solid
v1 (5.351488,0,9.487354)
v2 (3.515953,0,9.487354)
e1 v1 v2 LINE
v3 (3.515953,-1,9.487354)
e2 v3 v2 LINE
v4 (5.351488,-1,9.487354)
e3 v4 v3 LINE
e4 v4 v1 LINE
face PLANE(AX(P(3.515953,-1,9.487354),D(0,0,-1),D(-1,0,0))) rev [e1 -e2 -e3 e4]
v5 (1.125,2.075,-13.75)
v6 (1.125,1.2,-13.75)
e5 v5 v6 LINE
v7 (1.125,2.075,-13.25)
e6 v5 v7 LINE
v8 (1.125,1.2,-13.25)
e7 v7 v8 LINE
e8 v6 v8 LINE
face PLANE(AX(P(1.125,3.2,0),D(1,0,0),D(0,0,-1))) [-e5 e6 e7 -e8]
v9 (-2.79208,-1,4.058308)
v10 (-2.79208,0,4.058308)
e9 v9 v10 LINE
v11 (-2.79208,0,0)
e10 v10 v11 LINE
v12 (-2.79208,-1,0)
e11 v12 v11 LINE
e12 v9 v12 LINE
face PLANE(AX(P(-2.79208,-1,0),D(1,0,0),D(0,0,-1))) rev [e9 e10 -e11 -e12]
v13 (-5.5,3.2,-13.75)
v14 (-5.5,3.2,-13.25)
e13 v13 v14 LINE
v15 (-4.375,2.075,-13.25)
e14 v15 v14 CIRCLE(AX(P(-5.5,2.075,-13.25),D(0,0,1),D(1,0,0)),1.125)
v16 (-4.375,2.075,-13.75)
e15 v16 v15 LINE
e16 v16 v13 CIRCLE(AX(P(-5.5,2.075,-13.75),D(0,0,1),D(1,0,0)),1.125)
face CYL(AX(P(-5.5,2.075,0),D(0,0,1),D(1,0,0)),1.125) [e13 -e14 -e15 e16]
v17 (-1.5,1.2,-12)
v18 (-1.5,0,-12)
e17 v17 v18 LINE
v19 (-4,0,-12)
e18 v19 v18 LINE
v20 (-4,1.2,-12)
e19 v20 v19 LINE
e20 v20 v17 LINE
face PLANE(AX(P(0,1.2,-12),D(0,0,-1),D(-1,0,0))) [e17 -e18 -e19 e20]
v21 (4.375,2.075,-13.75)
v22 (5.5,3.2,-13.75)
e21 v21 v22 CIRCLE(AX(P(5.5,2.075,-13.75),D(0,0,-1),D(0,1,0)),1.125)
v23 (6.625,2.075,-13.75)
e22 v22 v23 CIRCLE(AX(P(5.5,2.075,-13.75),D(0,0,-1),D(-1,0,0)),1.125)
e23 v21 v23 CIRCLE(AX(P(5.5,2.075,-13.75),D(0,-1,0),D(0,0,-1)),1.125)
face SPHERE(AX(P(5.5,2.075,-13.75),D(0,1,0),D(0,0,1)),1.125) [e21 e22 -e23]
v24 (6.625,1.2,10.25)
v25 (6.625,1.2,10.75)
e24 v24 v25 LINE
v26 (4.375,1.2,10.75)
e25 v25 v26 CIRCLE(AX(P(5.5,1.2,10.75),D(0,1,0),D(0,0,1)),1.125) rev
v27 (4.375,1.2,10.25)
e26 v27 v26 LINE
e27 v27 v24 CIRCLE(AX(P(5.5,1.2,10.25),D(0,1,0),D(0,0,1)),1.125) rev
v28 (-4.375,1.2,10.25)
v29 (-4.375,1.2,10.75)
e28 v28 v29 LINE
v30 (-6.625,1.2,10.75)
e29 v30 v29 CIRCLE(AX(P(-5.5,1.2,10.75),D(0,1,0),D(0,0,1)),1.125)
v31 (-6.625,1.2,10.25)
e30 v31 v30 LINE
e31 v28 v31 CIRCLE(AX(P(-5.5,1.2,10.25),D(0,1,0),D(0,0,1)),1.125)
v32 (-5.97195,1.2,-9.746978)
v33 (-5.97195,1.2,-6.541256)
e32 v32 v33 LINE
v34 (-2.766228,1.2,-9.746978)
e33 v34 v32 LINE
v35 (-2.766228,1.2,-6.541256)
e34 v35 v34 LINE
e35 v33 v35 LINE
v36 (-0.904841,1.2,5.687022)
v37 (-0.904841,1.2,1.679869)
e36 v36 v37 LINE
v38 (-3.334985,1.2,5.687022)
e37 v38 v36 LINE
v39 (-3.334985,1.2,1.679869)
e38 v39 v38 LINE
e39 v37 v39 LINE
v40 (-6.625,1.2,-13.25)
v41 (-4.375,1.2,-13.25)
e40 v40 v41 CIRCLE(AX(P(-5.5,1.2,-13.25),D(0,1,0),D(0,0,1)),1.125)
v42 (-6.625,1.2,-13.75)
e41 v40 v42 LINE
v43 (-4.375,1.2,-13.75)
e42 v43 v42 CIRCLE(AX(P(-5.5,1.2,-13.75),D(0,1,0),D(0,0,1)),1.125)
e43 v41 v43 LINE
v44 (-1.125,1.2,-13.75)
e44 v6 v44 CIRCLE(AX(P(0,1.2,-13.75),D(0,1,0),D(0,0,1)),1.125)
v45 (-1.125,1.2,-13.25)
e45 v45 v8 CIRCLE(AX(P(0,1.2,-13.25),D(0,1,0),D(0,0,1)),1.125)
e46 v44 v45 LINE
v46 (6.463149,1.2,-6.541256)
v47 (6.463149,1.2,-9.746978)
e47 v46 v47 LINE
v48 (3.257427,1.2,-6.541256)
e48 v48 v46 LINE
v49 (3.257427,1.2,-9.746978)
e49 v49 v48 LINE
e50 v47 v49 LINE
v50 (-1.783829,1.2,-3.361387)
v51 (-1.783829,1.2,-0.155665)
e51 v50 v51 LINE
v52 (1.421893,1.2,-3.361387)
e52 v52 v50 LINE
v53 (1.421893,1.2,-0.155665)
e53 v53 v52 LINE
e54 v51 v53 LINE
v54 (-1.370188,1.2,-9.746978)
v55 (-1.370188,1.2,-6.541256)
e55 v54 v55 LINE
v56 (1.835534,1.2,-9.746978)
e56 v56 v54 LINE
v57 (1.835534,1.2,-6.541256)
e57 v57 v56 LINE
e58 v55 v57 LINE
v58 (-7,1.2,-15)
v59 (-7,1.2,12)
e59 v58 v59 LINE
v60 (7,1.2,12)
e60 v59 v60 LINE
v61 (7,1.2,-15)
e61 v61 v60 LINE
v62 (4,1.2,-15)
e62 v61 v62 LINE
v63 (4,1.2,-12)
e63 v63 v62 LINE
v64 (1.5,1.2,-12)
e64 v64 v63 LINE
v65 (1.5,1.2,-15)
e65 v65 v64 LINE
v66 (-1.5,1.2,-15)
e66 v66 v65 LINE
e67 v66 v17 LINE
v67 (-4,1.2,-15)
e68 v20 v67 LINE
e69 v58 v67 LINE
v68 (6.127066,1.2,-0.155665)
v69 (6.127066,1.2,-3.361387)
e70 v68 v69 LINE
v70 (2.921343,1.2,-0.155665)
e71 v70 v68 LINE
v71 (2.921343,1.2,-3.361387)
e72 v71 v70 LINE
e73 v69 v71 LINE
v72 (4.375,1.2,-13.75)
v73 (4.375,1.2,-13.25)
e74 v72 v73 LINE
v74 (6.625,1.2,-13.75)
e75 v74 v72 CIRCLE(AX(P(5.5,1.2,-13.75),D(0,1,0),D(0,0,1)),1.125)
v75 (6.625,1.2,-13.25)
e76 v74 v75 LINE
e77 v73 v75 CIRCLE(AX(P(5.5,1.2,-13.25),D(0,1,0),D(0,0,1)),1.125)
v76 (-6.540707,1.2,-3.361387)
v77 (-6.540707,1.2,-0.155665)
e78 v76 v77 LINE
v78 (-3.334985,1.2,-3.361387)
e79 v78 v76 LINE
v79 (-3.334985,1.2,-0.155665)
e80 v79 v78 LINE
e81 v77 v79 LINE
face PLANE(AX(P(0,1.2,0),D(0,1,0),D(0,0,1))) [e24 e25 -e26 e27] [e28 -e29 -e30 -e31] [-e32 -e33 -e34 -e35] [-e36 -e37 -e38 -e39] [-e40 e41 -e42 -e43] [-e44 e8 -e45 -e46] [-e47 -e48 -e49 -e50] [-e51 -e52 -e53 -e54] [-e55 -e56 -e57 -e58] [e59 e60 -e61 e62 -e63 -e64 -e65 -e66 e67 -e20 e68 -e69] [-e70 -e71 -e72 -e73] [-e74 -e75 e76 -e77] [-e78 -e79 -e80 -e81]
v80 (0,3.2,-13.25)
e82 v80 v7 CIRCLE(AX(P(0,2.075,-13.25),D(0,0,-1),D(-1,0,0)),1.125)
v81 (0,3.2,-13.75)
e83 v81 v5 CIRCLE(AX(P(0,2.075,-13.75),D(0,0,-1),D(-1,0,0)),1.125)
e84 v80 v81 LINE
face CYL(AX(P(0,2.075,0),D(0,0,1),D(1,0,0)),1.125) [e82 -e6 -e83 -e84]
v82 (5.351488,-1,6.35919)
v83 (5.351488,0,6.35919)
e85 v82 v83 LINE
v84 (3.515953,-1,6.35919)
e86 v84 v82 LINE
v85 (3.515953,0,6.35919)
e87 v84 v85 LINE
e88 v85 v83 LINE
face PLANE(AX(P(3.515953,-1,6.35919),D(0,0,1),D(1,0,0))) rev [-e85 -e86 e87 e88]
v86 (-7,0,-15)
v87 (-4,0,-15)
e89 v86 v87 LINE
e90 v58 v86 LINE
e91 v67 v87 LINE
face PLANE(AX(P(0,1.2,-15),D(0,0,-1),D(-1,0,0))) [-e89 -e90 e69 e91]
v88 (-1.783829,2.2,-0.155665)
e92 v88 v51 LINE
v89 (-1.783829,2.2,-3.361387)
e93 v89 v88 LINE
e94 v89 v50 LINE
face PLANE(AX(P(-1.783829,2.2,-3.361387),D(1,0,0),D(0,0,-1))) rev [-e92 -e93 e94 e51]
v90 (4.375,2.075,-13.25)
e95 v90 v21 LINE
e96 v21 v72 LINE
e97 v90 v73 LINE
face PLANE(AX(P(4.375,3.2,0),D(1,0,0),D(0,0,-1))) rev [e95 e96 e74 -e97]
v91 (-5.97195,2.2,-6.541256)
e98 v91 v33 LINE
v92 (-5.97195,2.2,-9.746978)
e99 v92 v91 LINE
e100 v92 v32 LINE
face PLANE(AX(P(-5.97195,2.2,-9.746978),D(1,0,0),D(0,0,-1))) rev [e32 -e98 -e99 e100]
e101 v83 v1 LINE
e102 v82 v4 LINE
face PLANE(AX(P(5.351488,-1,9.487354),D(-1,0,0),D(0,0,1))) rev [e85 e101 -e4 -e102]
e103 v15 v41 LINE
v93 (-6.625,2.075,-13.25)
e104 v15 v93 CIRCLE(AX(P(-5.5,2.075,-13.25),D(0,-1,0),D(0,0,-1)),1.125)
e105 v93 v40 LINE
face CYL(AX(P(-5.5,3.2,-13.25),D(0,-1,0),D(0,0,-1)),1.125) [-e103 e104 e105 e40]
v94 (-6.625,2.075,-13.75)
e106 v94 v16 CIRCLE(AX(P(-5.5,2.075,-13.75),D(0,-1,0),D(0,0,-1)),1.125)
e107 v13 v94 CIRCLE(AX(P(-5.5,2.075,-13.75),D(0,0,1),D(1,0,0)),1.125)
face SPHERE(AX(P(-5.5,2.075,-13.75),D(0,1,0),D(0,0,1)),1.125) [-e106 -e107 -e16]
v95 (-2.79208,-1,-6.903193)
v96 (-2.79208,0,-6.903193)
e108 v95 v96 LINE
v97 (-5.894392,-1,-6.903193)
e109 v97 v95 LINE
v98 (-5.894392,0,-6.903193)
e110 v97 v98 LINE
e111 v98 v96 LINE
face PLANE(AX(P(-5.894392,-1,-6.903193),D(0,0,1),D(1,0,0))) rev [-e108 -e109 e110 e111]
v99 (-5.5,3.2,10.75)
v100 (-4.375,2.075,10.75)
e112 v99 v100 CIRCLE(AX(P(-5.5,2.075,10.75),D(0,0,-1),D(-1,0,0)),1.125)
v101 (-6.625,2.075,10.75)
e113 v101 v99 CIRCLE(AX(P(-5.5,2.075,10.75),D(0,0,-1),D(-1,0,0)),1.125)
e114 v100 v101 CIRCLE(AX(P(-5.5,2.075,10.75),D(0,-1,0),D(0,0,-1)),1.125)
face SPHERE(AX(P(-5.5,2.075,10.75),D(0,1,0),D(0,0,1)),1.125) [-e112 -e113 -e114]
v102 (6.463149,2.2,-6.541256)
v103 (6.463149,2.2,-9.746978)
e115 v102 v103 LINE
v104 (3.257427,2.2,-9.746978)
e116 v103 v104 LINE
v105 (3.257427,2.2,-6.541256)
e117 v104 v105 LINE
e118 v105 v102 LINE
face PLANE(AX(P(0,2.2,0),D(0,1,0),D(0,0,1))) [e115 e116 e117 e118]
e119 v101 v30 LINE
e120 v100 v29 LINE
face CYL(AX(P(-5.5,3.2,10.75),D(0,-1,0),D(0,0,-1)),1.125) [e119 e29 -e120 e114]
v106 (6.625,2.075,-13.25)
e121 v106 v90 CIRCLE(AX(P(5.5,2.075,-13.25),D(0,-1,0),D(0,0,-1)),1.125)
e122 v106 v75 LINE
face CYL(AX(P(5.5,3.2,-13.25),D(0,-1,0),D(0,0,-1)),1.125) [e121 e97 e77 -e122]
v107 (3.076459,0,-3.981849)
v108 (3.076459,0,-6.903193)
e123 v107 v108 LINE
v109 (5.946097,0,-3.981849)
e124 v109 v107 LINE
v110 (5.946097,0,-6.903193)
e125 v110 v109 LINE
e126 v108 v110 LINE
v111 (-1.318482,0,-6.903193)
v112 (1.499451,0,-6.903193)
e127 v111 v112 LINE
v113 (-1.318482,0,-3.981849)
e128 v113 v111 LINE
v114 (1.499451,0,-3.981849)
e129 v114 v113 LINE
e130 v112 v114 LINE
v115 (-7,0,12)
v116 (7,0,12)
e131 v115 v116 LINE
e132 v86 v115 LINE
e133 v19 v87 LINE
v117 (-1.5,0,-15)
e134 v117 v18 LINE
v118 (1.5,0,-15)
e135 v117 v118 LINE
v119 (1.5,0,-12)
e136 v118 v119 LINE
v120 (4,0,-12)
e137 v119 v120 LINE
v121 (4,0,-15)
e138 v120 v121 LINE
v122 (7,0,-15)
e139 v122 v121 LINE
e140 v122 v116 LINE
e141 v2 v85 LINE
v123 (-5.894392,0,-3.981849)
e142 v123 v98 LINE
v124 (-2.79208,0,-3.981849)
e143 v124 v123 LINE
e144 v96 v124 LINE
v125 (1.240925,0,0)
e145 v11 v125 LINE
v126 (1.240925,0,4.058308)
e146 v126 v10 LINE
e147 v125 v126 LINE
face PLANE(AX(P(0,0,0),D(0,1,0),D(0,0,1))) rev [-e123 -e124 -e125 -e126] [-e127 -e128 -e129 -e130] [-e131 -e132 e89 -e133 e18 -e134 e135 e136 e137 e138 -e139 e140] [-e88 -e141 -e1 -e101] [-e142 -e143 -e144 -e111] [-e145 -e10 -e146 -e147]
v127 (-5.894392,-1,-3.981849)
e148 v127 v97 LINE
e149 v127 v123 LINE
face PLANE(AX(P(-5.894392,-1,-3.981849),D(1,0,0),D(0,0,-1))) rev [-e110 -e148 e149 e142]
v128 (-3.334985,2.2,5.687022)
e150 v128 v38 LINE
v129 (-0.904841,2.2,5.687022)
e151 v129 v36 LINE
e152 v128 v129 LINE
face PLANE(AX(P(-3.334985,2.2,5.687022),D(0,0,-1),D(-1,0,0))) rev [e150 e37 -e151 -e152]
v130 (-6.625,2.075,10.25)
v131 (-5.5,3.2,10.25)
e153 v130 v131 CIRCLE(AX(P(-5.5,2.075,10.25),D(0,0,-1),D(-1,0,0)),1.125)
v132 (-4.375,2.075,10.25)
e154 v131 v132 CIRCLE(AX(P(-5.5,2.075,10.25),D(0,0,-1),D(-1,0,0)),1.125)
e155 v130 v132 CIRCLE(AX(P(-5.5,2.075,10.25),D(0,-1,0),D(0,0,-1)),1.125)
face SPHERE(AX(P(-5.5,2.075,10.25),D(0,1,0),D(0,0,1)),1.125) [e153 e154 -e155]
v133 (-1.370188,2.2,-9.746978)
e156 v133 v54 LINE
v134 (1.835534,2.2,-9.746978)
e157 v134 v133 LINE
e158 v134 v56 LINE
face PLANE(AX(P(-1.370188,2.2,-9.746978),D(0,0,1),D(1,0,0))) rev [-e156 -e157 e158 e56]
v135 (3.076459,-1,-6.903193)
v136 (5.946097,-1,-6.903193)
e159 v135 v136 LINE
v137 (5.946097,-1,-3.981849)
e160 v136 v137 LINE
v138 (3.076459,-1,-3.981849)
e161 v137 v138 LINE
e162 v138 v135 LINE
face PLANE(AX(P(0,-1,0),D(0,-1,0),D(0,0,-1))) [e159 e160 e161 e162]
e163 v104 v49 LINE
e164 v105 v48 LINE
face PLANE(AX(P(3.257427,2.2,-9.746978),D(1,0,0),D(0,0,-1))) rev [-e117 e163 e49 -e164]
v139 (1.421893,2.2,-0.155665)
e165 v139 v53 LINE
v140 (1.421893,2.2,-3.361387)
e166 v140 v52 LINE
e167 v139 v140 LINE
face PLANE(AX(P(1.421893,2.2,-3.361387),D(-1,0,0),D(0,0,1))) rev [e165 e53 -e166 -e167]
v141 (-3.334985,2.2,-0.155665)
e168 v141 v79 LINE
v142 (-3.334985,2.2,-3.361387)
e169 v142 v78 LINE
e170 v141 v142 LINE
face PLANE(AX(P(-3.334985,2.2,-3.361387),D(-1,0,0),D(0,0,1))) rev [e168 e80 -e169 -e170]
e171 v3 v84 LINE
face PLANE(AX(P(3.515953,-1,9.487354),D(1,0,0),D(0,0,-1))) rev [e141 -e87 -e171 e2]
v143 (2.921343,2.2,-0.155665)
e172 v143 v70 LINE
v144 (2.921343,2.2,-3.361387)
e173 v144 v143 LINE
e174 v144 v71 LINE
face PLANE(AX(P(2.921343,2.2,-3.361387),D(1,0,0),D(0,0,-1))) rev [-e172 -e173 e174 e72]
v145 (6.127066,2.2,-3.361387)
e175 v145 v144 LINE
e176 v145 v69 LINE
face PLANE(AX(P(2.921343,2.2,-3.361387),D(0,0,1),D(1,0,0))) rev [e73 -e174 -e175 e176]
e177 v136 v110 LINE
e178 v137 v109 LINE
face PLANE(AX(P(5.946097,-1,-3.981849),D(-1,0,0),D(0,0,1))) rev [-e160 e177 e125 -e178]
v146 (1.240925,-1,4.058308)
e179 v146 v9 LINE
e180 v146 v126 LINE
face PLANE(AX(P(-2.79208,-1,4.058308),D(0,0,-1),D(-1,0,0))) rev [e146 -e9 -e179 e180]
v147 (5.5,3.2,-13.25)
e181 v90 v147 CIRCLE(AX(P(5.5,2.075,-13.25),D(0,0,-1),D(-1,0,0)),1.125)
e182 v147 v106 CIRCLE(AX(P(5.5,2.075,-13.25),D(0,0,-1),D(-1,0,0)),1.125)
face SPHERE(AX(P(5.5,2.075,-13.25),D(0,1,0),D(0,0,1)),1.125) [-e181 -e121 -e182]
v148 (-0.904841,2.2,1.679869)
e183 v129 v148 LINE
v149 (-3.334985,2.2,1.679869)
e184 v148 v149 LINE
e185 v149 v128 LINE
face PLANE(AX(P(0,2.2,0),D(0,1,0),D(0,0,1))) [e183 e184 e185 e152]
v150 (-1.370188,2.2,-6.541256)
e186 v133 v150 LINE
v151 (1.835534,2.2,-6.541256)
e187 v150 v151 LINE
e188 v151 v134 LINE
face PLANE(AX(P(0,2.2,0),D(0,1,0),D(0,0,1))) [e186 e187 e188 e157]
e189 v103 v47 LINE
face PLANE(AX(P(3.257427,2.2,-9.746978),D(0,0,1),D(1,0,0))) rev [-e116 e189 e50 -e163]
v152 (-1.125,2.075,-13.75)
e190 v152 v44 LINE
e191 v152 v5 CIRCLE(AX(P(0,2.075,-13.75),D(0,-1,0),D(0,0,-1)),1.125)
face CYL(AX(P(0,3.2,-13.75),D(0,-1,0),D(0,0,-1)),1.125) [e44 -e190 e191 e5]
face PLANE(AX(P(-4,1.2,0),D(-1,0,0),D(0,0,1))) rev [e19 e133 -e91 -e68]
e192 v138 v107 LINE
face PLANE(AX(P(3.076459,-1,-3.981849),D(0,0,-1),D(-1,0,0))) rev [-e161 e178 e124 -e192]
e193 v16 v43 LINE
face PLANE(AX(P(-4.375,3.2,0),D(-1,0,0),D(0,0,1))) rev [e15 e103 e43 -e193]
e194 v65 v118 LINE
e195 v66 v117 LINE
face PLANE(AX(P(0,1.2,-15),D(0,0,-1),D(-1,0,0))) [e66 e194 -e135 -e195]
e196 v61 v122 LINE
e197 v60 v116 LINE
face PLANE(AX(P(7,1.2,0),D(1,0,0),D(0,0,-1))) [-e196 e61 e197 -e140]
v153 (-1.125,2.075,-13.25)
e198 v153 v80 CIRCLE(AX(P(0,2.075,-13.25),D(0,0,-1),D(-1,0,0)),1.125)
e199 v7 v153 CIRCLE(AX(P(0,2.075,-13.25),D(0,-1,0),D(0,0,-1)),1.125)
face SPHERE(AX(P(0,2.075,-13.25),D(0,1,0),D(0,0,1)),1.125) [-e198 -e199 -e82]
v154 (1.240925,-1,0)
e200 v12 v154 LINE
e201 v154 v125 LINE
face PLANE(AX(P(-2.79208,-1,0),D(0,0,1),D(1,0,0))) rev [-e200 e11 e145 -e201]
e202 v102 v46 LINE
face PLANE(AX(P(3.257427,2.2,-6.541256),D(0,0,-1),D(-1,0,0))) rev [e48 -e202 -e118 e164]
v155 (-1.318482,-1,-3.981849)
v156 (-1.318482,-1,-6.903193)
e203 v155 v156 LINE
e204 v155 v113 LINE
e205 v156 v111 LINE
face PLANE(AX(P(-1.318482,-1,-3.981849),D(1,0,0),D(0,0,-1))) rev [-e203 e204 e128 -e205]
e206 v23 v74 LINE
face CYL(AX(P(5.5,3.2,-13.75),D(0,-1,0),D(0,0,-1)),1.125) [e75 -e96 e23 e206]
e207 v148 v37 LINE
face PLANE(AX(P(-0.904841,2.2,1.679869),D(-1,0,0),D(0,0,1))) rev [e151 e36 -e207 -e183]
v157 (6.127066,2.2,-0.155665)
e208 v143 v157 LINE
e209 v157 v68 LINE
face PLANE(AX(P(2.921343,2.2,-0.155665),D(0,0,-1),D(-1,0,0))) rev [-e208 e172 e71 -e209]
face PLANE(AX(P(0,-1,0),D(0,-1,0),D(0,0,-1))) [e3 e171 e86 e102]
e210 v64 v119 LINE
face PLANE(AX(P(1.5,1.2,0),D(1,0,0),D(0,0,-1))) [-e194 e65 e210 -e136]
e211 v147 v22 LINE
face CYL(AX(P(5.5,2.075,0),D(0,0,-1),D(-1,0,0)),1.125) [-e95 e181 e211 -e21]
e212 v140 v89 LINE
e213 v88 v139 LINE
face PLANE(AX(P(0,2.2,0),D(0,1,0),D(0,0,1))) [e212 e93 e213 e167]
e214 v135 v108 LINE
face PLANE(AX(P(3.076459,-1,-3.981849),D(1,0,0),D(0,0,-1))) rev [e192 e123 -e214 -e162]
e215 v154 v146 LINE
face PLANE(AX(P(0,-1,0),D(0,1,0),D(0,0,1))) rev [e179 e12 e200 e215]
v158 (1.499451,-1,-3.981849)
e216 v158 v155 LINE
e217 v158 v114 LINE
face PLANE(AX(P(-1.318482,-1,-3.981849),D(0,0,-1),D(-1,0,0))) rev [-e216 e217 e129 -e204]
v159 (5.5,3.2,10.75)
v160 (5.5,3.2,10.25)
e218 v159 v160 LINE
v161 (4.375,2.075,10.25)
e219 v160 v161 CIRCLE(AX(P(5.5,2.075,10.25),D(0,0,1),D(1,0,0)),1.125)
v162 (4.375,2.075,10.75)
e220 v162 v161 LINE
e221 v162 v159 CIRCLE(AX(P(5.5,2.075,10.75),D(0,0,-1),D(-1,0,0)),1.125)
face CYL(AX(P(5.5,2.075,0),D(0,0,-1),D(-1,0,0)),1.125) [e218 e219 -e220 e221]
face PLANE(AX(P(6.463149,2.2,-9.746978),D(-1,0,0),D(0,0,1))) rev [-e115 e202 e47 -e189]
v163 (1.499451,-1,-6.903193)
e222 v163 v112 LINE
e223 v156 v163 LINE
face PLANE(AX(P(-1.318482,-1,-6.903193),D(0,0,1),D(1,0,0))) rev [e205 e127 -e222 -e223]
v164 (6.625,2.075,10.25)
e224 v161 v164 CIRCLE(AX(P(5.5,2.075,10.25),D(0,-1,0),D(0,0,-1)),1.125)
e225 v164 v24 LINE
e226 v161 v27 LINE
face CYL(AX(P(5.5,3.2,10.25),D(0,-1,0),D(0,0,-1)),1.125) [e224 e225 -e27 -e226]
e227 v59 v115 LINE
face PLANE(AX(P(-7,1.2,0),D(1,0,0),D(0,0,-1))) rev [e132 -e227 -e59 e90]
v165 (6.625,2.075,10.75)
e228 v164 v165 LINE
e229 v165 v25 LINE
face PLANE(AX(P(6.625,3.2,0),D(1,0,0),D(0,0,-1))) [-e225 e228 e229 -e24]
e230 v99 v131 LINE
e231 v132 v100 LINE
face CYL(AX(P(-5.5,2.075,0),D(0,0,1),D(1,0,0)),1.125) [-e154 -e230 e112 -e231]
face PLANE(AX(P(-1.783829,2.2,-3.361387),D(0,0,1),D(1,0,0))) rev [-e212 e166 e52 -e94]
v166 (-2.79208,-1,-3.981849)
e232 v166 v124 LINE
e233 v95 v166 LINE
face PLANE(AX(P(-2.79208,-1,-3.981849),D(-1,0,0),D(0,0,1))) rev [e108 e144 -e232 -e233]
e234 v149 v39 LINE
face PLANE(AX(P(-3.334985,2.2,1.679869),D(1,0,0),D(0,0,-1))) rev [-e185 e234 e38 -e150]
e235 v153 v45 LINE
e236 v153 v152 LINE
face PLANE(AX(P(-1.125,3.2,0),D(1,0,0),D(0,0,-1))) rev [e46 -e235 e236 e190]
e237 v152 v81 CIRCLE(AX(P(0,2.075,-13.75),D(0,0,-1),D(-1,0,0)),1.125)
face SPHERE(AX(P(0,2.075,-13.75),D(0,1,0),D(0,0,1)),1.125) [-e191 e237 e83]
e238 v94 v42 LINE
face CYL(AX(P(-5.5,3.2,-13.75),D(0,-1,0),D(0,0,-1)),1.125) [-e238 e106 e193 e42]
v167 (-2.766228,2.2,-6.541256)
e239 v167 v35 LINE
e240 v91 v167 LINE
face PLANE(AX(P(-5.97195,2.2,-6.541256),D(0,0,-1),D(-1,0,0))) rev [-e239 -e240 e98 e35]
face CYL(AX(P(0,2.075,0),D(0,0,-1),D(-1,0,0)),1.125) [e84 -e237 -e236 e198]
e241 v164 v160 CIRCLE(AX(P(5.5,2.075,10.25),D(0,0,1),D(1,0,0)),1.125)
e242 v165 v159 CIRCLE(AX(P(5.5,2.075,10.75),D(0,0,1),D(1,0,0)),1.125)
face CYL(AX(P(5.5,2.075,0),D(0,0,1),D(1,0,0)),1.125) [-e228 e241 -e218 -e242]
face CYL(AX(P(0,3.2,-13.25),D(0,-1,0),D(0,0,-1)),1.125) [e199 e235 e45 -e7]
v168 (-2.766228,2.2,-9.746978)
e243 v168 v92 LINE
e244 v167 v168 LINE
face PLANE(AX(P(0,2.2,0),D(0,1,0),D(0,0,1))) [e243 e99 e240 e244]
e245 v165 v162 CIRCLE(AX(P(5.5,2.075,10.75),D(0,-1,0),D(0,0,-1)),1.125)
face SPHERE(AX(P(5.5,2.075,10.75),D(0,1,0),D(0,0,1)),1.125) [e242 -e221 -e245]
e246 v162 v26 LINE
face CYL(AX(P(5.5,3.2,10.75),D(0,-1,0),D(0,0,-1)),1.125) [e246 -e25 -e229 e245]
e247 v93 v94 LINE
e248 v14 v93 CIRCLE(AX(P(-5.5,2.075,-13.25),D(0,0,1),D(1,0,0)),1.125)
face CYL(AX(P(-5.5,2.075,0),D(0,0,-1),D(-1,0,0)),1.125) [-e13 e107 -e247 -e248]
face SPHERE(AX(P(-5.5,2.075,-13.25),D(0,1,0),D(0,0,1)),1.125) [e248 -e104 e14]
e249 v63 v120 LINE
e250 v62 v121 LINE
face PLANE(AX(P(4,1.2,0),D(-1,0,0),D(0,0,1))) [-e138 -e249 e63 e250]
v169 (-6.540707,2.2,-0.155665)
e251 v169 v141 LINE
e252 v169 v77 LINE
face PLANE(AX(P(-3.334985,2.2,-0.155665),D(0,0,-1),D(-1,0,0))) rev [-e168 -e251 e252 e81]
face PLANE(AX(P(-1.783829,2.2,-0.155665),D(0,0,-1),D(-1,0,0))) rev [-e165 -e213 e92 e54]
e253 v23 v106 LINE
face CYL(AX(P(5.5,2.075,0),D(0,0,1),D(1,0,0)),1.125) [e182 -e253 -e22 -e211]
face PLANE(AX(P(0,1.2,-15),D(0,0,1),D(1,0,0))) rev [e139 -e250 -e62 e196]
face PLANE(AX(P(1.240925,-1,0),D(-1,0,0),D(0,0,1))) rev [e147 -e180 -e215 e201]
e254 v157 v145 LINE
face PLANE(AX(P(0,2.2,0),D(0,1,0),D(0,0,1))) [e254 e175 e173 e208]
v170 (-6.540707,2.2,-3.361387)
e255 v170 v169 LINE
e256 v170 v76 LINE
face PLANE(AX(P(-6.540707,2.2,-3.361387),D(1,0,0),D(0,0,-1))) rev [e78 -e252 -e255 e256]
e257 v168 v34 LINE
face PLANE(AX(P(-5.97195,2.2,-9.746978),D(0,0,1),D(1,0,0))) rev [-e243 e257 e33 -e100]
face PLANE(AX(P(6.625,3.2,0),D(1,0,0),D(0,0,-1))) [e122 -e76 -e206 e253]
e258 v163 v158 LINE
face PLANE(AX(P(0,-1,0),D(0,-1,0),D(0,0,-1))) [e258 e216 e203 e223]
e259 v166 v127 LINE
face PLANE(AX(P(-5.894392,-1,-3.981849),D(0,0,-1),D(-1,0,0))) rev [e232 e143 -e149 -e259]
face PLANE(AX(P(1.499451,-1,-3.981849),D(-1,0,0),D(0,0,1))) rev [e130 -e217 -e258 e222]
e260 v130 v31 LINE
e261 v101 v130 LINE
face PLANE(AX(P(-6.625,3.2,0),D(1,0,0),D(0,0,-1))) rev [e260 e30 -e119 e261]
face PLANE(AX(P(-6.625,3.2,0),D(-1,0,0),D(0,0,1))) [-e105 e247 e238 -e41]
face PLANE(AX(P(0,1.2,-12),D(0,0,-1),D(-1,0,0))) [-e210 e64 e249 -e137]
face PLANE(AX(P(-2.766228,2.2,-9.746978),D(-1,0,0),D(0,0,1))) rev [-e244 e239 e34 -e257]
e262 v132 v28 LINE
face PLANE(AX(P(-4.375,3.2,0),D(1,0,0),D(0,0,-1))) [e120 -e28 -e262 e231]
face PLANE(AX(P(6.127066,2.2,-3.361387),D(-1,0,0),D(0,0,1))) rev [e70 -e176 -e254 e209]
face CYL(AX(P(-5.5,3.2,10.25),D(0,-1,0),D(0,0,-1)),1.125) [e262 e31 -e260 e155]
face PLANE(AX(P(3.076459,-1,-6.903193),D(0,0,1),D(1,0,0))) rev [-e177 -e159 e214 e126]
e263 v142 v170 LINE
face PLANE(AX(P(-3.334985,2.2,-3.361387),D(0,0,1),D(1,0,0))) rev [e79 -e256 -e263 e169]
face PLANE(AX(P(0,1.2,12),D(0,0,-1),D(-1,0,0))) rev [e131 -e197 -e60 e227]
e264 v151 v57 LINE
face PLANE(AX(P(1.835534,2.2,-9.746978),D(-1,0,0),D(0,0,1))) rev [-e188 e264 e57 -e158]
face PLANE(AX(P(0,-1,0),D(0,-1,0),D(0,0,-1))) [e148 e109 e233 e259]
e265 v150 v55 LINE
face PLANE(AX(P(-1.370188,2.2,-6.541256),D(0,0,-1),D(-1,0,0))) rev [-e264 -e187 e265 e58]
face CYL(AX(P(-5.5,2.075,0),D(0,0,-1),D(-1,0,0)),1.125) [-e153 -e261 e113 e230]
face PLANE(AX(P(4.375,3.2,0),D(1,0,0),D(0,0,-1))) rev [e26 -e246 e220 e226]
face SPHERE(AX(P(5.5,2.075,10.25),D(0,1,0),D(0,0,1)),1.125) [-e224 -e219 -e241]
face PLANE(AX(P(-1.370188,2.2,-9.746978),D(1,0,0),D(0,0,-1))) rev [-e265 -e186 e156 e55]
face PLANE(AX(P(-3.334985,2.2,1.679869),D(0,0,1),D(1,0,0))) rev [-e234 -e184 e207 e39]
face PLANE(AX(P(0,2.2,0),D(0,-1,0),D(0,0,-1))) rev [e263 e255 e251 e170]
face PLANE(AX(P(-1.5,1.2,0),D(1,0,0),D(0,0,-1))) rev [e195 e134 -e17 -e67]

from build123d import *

# Parameters (mm, degrees)
SKETCH1_W               = 14
SKETCH1_H               = 24
SKETCH1_W_2             = 3
SKETCH1_H_2             = 3
PCB_DEPTH               = 1.2
SOLDER_JOINTS_DEPTH     = 2
SOLDER_FILLETS_R        = 1.125
SKETCH2_W               = 3.205722041
SKETCH2_H               = 3.205722042
SKETCH2_W_2             = 3.205722042
SKETCH2_W_3             = 2.430144128
SKETCH2_H_2             = 4.007152552
TOP_COMPONENTS_DEPTH    = 1
SKETCH3_W               = 4.033005149
SKETCH3_H               = 4.058308378
SKETCH3_W_2             = 3.102311653
SKETCH3_H_2             = 2.921343474
SKETCH3_W_3             = 2.817933085
SKETCH3_W_4             = 2.869638279
SKETCH3_W_5             = 1.835534395
SKETCH3_H_3             = 3.12816425
BOTTOM_COMPONENTS_DEPTH = 1


with BuildPart() as part:
    # Sketch1 → PCB (new body)
    with BuildSketch(Plane(origin=(0, 0, 0), x_dir=(1, 0, 0), z_dir=(0, 1, 0))):
        Rectangle(SKETCH1_W, SKETCH1_H)
        with Locations((-5.5, 13.5)):
            Rectangle(SKETCH1_W_2, SKETCH1_H_2)
        with Locations((0, 13.5)):
            Rectangle(SKETCH1_W_2, SKETCH1_H_2)
        with Locations((5.5, 13.5)):
            Rectangle(SKETCH1_W_2, SKETCH1_H_2)
    extrude(amount=PCB_DEPTH)

    # Sketch5 → Solder joints (add)
    with BuildSketch(Plane(origin=(0, 1.2, 0), x_dir=(1, 0, 0), z_dir=(0, 1, 0))):
        with BuildLine():
            Line((-4.375, 13.25), (-4.375, 13.75))
            ThreePointArc((-4.375, 13.75), (-5.5, 14.875), (-6.625, 13.75))
            Line((-6.625, 13.75), (-6.625, 13.25))
            ThreePointArc((-6.625, 13.25), (-5.5, 12.125), (-4.375, 13.25))
        make_face()
        with BuildLine():
            Line((-1.125, 13.75), (-1.125, 13.25))
            ThreePointArc((-1.125, 13.25), (0, 12.125), (1.125, 13.25))
            Line((1.125, 13.25), (1.125, 13.75))
            ThreePointArc((1.125, 13.75), (0, 14.875), (-1.125, 13.75))
        make_face()
        with BuildLine():
            Line((4.375, 13.75), (4.375, 13.25))
            ThreePointArc((4.375, 13.25), (5.5, 12.125), (6.625, 13.25))
            Line((6.625, 13.25), (6.625, 13.75))
            ThreePointArc((6.625, 13.75), (5.5, 14.875), (4.375, 13.75))
        make_face()
        with BuildLine():
            Line((-6.625, -10.25), (-6.625, -10.75))
            ThreePointArc((-6.625, -10.75), (-5.5, -11.875), (-4.375, -10.75))
            Line((-4.375, -10.75), (-4.375, -10.25))
            ThreePointArc((-4.375, -10.25), (-5.5, -9.125), (-6.625, -10.25))
        make_face()
        with BuildLine():
            ThreePointArc((6.625, -10.75), (5.5, -11.875), (4.375, -10.75))
            Line((4.375, -10.75), (4.375, -10.25))
            ThreePointArc((4.375, -10.25), (5.5, -9.125), (6.625, -10.25))
            Line((6.625, -10.25), (6.625, -10.75))
        make_face()
    extrude(amount=SOLDER_JOINTS_DEPTH)

    # Solder fillets
    solder_fillets_edges = [part.edges().sort_by_distance(p)[0] for p in [
        (-6.625, 3.2, -13.5),
        (-4.375, 3.2, -13.5),
        (-5.5, 3.2, -14.875),
        (-5.5, 3.2, -12.125),
        (1.125, 3.2, -13.5),
        (-1.125, 3.2, -13.5),
        (0, 3.2, -12.125),
        (0, 3.2, -14.875),
        (6.625, 3.2, -13.5),
        (4.375, 3.2, -13.5),
        (5.5, 3.2, -12.125),
        (5.5, 3.2, -14.875),
        (-4.375, 3.2, 10.5),
        (-6.625, 3.2, 10.5),
        (-5.5, 3.2, 11.875),
        (-5.5, 3.2, 9.125),
        (5.5, 3.2, 11.875),
        (6.625, 3.2, 10.5),
        (5.5, 3.2, 9.125),
        (4.375, 3.2, 10.5),
    ]]
    fillet(solder_fillets_edges, radius=SOLDER_FILLETS_R - 0.0001)  # a hair under: the kernel refuses the full size

    # Sketch2 → Top components (add)
    with BuildSketch(Plane(origin=(0, 1.2, 0), x_dir=(1, 0, 0), z_dir=(0, 1, 0))):
        with Locations((-4.369088912, 8.144117457)):
            Rectangle(SKETCH2_W, SKETCH2_H)
        with Locations((0.232673374, 8.144117457)):
            Rectangle(SKETCH2_W_2, SKETCH2_H)
        with Locations((4.860288257, 8.144117457)):
            Rectangle(SKETCH2_W, SKETCH2_H)
        with Locations((-4.937846048, 1.758525971)):
            Rectangle(SKETCH2_W_2, SKETCH2_H)
        with Locations((-0.18096818, 1.758525971)):
            Rectangle(SKETCH2_W_2, SKETCH2_H)
        with Locations((4.524204494, 1.758525971)):
            Rectangle(SKETCH2_W_2, SKETCH2_H)
        with Locations((-2.119912963, -3.68344572)):
            Rectangle(SKETCH2_W_3, SKETCH2_H_2)
    extrude(amount=TOP_COMPONENTS_DEPTH)

    # Sketch3 → Bottom components (add)
    with BuildSketch(Plane.XZ):
        with Locations((-0.775577914, 2.029154189)):
            Rectangle(SKETCH3_W, SKETCH3_H)
        with Locations((-4.343236315, -5.442521059)):
            Rectangle(SKETCH3_W_2, SKETCH3_H_2)
        with Locations((0.090484089, -5.442521059)):
            Rectangle(SKETCH3_W_3, SKETCH3_H_2)
        with Locations((4.511278196, -5.442521059)):
            Rectangle(SKETCH3_W_4, SKETCH3_H_2)
        with Locations((4.433720405, 7.923271646)):
            Rectangle(SKETCH3_W_5, SKETCH3_H_3)
    extrude(amount=BOTTOM_COMPONENTS_DEPTH)


solid = part.part
